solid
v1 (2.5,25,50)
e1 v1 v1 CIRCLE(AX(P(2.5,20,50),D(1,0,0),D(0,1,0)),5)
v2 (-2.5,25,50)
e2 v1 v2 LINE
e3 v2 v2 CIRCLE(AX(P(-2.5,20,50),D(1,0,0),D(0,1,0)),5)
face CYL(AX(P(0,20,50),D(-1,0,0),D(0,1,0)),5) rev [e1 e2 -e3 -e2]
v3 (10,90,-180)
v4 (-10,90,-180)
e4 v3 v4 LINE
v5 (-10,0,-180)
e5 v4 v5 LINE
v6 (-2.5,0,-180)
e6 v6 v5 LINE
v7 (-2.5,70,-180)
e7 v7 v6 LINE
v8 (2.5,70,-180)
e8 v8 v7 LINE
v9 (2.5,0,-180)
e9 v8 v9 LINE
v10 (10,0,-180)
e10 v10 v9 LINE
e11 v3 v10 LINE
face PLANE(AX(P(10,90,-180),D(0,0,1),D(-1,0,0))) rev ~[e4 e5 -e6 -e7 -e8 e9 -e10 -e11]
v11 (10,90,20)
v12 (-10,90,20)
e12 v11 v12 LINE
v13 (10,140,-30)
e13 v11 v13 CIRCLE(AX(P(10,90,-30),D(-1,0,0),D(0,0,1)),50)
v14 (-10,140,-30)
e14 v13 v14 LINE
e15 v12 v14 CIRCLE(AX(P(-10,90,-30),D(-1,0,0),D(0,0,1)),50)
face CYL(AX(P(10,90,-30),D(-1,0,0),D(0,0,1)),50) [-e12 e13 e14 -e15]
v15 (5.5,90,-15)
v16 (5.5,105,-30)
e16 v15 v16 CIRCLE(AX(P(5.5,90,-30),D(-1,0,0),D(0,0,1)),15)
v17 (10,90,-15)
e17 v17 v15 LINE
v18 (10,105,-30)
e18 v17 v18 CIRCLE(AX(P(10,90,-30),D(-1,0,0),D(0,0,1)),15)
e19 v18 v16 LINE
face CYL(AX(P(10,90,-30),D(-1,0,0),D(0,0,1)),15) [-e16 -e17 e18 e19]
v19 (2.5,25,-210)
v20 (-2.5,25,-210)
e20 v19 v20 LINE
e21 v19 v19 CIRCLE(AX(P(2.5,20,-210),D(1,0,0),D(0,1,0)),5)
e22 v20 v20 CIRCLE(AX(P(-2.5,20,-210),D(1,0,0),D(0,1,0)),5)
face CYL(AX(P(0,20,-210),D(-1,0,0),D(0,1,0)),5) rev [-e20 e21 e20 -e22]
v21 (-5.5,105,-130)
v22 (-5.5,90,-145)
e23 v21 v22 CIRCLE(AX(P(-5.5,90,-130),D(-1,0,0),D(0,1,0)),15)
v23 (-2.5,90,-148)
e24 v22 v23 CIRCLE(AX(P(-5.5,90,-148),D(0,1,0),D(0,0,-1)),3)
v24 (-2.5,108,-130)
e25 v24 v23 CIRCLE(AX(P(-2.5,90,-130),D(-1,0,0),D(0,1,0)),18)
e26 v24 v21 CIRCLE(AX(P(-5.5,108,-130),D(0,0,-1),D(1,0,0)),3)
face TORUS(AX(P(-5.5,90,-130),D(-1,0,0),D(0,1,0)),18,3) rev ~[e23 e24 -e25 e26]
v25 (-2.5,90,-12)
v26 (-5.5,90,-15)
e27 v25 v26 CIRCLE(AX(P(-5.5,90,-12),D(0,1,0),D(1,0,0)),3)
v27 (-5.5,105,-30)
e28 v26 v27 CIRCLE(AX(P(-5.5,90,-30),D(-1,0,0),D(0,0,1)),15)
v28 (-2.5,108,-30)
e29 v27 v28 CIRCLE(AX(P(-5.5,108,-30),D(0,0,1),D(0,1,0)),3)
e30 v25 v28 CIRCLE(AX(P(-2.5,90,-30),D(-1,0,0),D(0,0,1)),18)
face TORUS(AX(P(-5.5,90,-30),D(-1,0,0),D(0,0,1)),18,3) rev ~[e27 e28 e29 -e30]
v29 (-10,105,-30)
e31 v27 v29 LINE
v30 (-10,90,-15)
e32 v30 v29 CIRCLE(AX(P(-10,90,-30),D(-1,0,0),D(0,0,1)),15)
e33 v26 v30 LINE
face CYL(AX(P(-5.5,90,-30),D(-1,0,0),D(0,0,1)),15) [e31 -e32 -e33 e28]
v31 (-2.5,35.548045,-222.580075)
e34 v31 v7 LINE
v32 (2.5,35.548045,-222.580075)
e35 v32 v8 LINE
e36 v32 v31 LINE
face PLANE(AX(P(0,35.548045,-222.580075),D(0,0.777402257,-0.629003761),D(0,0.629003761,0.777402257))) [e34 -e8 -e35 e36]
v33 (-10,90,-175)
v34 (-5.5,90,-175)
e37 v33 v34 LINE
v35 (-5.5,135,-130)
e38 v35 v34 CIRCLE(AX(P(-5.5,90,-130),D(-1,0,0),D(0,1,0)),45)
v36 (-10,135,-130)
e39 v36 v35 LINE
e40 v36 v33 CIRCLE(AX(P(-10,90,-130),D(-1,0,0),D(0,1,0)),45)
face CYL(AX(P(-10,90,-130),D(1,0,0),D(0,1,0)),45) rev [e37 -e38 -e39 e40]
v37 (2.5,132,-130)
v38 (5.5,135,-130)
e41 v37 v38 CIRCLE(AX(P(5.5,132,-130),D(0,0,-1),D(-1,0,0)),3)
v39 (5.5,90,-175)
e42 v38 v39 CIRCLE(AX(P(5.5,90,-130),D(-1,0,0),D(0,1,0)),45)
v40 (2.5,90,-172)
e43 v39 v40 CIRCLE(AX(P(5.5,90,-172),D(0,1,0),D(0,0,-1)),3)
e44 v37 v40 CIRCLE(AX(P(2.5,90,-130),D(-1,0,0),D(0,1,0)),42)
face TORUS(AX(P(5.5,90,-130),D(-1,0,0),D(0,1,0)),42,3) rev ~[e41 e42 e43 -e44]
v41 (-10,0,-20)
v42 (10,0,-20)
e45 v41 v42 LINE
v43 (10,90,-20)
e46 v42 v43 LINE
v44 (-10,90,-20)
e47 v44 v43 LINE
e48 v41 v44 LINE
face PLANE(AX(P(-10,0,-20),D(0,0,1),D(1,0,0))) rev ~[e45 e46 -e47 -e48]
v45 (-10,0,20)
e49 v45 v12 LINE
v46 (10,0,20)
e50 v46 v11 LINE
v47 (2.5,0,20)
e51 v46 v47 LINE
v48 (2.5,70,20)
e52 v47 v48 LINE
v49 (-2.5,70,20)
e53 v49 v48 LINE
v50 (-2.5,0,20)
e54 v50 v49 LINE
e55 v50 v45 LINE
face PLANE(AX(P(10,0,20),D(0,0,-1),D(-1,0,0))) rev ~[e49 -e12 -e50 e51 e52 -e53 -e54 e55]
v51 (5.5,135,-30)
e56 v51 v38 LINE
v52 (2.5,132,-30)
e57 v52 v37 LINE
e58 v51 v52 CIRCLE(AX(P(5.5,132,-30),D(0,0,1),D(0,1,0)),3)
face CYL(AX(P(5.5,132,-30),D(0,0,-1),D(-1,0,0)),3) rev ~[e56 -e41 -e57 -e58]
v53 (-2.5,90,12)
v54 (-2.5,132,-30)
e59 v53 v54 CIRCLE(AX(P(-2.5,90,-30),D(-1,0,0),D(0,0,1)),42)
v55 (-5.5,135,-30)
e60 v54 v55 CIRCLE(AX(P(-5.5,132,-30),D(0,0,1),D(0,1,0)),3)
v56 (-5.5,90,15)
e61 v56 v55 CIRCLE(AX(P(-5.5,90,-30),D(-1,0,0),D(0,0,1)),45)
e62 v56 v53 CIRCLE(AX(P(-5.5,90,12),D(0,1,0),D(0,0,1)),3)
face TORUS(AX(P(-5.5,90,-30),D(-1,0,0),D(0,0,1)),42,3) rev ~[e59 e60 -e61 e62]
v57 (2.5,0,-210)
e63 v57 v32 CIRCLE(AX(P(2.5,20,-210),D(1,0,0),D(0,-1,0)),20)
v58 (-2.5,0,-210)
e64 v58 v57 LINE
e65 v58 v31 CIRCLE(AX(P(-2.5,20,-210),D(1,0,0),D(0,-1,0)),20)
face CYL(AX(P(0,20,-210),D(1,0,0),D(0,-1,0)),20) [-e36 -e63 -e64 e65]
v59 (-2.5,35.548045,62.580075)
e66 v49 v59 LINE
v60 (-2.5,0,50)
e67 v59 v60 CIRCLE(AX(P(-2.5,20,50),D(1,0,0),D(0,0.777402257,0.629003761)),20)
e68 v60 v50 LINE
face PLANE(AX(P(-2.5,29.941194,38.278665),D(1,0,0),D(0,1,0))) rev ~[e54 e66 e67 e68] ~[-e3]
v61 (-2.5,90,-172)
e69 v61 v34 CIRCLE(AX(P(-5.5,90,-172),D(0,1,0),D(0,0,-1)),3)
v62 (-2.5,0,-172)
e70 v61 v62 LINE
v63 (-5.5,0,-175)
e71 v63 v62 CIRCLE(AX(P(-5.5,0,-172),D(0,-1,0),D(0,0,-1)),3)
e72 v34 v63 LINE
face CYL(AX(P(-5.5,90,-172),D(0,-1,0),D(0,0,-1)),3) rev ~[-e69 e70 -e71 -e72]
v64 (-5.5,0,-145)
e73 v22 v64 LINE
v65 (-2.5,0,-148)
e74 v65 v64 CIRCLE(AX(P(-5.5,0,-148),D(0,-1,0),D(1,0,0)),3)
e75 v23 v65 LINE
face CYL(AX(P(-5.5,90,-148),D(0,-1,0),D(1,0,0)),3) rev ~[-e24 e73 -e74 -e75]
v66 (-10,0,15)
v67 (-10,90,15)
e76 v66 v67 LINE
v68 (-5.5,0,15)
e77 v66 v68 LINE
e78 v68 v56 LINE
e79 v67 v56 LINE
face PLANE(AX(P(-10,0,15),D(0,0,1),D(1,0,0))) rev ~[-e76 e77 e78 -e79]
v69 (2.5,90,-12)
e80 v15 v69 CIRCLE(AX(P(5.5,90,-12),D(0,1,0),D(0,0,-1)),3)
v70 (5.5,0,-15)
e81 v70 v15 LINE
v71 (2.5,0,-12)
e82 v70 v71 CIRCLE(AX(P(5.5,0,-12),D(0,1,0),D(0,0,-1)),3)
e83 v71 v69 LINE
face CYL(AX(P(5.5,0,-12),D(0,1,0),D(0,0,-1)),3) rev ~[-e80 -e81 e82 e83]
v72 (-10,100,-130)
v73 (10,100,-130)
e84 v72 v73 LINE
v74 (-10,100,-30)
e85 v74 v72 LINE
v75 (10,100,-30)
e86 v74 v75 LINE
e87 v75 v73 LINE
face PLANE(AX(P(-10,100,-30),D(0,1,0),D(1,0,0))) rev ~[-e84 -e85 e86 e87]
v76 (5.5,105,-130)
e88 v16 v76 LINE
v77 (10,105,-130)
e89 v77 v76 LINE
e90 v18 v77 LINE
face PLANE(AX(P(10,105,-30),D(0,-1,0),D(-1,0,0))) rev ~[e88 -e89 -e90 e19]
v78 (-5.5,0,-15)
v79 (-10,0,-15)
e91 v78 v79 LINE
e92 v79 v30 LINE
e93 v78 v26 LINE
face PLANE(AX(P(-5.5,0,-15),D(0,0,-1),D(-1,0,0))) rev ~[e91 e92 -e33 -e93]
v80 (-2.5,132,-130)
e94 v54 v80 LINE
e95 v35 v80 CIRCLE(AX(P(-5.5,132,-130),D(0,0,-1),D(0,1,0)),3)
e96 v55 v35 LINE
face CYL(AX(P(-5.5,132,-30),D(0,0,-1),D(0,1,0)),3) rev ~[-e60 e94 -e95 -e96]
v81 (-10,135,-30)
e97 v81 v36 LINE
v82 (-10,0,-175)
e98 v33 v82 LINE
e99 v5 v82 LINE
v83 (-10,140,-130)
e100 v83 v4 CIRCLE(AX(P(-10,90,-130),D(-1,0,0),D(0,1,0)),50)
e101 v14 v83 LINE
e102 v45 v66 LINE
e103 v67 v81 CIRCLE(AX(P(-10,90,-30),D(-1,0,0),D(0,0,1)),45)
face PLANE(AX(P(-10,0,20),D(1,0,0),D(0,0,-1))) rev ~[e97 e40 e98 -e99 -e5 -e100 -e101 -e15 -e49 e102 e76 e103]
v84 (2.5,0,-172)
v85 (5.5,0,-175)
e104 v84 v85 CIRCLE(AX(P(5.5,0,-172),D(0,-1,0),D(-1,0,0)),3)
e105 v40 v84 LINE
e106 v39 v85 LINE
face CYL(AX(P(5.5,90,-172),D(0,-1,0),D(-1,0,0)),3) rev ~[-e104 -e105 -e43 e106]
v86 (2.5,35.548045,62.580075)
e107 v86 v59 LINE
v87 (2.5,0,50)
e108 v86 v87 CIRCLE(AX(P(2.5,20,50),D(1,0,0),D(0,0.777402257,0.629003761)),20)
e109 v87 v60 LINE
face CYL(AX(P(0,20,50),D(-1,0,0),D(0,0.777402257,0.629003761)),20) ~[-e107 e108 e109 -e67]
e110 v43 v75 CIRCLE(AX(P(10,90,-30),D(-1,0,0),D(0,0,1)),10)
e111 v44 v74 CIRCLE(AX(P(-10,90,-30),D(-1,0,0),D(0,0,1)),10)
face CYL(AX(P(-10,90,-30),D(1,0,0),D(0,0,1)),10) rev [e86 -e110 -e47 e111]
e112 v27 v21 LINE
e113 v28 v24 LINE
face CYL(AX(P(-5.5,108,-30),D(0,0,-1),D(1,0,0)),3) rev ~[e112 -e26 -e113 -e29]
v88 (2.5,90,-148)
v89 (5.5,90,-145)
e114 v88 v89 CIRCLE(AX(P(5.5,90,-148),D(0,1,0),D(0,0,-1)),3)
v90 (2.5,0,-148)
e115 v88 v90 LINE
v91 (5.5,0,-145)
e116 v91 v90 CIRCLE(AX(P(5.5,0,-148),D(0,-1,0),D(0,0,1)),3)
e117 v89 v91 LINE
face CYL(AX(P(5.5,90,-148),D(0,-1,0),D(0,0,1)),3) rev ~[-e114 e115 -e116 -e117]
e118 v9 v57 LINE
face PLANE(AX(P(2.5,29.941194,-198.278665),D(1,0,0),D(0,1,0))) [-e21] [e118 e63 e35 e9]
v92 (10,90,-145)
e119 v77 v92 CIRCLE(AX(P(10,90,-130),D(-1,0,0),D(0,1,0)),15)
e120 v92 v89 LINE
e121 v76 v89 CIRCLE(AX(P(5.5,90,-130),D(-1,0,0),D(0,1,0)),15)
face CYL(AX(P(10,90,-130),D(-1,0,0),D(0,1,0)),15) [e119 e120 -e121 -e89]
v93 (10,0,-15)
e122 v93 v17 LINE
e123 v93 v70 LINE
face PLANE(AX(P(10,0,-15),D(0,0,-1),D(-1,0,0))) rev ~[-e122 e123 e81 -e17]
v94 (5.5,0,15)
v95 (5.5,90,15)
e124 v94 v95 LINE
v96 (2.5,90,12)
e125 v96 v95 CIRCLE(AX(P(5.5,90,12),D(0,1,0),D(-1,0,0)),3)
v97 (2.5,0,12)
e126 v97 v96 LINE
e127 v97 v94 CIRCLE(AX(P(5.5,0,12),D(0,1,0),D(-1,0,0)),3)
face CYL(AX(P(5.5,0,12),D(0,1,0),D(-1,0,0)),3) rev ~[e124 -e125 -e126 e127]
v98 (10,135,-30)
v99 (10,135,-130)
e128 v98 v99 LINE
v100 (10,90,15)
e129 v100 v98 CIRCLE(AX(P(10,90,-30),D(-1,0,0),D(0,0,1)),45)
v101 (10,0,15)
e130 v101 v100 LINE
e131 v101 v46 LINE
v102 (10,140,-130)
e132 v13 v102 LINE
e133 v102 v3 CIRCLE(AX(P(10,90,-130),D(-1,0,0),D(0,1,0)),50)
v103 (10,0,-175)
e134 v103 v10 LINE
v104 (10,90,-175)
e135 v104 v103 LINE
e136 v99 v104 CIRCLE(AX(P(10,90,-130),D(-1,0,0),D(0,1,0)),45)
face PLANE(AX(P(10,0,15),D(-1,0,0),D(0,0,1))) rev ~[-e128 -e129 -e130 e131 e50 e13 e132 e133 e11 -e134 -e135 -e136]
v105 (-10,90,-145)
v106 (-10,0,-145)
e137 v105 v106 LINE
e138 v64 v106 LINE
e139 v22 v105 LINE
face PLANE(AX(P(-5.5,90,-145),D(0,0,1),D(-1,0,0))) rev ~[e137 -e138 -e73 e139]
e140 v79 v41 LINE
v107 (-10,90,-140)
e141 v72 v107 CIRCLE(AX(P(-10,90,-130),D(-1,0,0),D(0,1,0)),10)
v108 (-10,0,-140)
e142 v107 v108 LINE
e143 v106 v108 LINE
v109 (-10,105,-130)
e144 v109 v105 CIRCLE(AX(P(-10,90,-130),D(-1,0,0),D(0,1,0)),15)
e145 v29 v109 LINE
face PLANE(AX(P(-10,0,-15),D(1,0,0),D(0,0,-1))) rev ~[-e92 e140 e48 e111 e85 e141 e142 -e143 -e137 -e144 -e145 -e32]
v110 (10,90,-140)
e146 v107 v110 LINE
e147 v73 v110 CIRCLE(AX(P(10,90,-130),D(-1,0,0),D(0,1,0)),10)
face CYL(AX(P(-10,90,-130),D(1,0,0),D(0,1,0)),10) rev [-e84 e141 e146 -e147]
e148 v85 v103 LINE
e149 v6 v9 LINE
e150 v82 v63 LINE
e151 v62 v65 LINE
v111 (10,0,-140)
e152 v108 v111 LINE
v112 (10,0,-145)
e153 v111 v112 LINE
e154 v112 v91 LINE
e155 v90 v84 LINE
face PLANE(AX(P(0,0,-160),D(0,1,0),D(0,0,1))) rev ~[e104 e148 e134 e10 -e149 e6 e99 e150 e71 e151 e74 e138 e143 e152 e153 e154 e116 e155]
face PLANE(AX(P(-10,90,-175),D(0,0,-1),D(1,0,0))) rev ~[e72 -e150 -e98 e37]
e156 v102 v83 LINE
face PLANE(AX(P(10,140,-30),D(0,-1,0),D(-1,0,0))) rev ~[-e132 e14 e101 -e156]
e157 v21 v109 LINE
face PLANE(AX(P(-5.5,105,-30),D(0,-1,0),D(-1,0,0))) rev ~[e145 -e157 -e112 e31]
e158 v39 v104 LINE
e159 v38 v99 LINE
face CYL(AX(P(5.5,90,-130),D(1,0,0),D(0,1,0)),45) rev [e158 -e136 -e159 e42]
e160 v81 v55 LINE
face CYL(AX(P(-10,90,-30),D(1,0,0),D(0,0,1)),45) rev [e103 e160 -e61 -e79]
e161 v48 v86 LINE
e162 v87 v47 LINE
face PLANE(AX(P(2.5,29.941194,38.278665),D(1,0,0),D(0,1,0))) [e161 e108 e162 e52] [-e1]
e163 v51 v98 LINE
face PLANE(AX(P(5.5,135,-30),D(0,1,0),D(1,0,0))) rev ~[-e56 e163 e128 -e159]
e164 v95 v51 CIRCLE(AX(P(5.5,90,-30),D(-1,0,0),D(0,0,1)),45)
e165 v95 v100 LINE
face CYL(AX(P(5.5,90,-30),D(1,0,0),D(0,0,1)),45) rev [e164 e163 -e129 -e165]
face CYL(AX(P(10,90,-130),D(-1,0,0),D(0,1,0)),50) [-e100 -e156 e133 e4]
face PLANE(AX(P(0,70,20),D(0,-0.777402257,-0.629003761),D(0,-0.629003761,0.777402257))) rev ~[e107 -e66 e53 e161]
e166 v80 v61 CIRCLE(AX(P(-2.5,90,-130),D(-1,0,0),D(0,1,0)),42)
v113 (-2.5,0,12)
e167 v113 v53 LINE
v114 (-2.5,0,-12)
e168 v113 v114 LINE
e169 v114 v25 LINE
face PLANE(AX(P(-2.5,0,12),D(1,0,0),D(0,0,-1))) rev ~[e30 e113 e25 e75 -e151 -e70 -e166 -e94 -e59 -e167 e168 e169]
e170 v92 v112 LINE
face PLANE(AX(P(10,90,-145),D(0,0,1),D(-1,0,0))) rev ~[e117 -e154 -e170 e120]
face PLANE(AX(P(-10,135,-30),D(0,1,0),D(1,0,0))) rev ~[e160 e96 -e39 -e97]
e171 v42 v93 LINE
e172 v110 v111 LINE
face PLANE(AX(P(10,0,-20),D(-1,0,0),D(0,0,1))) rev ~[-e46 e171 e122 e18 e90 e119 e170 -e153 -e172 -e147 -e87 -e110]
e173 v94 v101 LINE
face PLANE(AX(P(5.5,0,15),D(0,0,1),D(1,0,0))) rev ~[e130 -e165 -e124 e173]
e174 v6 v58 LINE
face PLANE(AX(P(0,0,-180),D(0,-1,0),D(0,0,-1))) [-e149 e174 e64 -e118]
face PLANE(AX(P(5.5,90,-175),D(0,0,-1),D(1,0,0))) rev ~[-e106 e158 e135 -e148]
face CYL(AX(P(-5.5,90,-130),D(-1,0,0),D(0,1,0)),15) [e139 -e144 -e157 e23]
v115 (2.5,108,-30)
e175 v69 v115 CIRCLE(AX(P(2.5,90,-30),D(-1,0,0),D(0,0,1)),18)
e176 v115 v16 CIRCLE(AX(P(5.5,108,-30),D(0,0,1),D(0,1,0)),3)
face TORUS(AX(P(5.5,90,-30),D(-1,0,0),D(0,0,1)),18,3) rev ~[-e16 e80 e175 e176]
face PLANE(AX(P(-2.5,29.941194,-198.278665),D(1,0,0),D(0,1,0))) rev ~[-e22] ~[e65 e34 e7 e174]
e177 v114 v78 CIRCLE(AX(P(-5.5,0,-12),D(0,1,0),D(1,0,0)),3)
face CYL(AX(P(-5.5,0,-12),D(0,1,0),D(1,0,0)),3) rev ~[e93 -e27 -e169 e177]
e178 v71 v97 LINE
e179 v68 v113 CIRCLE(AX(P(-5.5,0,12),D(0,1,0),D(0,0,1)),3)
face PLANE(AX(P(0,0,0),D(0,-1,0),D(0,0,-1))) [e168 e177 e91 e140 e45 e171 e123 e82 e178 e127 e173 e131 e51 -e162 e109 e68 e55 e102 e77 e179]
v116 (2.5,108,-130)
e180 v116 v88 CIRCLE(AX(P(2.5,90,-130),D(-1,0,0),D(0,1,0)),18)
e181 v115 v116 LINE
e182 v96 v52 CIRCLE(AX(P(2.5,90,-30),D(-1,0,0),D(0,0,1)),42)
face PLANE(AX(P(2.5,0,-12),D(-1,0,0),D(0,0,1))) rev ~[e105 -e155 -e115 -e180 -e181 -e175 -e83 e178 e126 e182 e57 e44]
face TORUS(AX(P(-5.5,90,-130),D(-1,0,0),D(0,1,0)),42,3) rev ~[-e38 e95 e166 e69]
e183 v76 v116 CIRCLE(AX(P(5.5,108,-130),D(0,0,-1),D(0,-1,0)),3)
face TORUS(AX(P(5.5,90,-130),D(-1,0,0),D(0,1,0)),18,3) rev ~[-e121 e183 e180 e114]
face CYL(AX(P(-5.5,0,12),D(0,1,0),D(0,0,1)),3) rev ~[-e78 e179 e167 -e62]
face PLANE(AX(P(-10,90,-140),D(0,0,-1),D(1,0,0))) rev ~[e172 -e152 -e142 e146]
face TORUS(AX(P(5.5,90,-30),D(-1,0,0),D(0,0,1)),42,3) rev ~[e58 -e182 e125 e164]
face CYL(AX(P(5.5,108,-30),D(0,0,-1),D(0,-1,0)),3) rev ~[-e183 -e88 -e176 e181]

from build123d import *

# Parameters (mm, degrees)
F3_R     = 5
F4_DEPTH = 2.5


# Not quite as in the source:
# - a feature names something its author has since deleted; it is built from what else it names


with BuildPart() as f2:
    # F2: sweep along a path in F1
    with BuildLine(Plane.YZ) as f2_path:
        Line((0, -20), (90, -20))
        ThreePointArc((90, -20), (97.0710678119, -22.9289321881), (100, -30))
        Line((100, -30), (100, -80))
        Line((100, -80), (100, -130))
        ThreePointArc((100, -130), (97.0710678119, -137.0710678119), (90, -140))
        Line((90, -140), (0, -140))
    # F0 (on Front) → F2 (sweep)
    with BuildSketch(Plane.XZ):
        with BuildLine():
            Line((2.5, -12), (2.5, 0))
            Line((2.5, 0), (2.5, 12))
            ThreePointArc((2.5, 12), (3.3786796564, 14.1213203436), (5.5, 15))
            Line((5.5, 15), (10, 15))
            Line((10, 15), (10, 20))
            Line((10, 20), (0, 20))
            Line((0, 20), (-10, 20))
            Line((-10, 20), (-10, 15))
            Line((-10, 15), (-5.5, 15))
            ThreePointArc((-5.5, 15), (-3.3786796564, 14.1213203436), (-2.5, 12))
            Line((-2.5, 12), (-2.5, 0))
            Line((-2.5, 0), (-2.5, -12))
            ThreePointArc((-2.5, -12), (-3.3786796564, -14.1213203436), (-5.5, -15))
            Line((-5.5, -15), (-10, -15))
            Line((-10, -15), (-10, -20))
            Line((-10, -20), (0, -20))
            Line((0, -20), (10, -20))
            Line((10, -20), (10, -15))
            Line((10, -15), (5.5, -15))
            ThreePointArc((5.5, -15), (3.3786796564, -14.1213203436), (2.5, -12))
        make_face()
    sweep(path=f2_path.line)

    # F3 (on Right) → F4 (join, symmetric)
    with BuildSketch(Plane.YZ):
        with BuildLine():
            Line((0, 50), (0, 20))
            Line((0, 20), (70, 20))
            Line((70, 20), (35.5480451324, 62.5800752207))
            ThreePointArc((35.5480451324, 62.5800752207), (13.3277028936, 68.8541892248), (0, 50))
        make_face()
        with Locations((20, 50)):
            Circle(F3_R, mode=Mode.SUBTRACT)
        with BuildLine():
            Line((70, -180), (0, -180))
            Line((0, -180), (0, -210))
            ThreePointArc((0, -210), (13.3277028936, -228.8541892248), (35.5480451324, -222.5800752207))
            Line((35.5480451324, -222.5800752207), (70, -180))
        make_face()
        with Locations((20, -210)):
            Circle(F3_R, mode=Mode.SUBTRACT)
    extrude(amount=F4_DEPTH, both=True)


solid = f2.part
